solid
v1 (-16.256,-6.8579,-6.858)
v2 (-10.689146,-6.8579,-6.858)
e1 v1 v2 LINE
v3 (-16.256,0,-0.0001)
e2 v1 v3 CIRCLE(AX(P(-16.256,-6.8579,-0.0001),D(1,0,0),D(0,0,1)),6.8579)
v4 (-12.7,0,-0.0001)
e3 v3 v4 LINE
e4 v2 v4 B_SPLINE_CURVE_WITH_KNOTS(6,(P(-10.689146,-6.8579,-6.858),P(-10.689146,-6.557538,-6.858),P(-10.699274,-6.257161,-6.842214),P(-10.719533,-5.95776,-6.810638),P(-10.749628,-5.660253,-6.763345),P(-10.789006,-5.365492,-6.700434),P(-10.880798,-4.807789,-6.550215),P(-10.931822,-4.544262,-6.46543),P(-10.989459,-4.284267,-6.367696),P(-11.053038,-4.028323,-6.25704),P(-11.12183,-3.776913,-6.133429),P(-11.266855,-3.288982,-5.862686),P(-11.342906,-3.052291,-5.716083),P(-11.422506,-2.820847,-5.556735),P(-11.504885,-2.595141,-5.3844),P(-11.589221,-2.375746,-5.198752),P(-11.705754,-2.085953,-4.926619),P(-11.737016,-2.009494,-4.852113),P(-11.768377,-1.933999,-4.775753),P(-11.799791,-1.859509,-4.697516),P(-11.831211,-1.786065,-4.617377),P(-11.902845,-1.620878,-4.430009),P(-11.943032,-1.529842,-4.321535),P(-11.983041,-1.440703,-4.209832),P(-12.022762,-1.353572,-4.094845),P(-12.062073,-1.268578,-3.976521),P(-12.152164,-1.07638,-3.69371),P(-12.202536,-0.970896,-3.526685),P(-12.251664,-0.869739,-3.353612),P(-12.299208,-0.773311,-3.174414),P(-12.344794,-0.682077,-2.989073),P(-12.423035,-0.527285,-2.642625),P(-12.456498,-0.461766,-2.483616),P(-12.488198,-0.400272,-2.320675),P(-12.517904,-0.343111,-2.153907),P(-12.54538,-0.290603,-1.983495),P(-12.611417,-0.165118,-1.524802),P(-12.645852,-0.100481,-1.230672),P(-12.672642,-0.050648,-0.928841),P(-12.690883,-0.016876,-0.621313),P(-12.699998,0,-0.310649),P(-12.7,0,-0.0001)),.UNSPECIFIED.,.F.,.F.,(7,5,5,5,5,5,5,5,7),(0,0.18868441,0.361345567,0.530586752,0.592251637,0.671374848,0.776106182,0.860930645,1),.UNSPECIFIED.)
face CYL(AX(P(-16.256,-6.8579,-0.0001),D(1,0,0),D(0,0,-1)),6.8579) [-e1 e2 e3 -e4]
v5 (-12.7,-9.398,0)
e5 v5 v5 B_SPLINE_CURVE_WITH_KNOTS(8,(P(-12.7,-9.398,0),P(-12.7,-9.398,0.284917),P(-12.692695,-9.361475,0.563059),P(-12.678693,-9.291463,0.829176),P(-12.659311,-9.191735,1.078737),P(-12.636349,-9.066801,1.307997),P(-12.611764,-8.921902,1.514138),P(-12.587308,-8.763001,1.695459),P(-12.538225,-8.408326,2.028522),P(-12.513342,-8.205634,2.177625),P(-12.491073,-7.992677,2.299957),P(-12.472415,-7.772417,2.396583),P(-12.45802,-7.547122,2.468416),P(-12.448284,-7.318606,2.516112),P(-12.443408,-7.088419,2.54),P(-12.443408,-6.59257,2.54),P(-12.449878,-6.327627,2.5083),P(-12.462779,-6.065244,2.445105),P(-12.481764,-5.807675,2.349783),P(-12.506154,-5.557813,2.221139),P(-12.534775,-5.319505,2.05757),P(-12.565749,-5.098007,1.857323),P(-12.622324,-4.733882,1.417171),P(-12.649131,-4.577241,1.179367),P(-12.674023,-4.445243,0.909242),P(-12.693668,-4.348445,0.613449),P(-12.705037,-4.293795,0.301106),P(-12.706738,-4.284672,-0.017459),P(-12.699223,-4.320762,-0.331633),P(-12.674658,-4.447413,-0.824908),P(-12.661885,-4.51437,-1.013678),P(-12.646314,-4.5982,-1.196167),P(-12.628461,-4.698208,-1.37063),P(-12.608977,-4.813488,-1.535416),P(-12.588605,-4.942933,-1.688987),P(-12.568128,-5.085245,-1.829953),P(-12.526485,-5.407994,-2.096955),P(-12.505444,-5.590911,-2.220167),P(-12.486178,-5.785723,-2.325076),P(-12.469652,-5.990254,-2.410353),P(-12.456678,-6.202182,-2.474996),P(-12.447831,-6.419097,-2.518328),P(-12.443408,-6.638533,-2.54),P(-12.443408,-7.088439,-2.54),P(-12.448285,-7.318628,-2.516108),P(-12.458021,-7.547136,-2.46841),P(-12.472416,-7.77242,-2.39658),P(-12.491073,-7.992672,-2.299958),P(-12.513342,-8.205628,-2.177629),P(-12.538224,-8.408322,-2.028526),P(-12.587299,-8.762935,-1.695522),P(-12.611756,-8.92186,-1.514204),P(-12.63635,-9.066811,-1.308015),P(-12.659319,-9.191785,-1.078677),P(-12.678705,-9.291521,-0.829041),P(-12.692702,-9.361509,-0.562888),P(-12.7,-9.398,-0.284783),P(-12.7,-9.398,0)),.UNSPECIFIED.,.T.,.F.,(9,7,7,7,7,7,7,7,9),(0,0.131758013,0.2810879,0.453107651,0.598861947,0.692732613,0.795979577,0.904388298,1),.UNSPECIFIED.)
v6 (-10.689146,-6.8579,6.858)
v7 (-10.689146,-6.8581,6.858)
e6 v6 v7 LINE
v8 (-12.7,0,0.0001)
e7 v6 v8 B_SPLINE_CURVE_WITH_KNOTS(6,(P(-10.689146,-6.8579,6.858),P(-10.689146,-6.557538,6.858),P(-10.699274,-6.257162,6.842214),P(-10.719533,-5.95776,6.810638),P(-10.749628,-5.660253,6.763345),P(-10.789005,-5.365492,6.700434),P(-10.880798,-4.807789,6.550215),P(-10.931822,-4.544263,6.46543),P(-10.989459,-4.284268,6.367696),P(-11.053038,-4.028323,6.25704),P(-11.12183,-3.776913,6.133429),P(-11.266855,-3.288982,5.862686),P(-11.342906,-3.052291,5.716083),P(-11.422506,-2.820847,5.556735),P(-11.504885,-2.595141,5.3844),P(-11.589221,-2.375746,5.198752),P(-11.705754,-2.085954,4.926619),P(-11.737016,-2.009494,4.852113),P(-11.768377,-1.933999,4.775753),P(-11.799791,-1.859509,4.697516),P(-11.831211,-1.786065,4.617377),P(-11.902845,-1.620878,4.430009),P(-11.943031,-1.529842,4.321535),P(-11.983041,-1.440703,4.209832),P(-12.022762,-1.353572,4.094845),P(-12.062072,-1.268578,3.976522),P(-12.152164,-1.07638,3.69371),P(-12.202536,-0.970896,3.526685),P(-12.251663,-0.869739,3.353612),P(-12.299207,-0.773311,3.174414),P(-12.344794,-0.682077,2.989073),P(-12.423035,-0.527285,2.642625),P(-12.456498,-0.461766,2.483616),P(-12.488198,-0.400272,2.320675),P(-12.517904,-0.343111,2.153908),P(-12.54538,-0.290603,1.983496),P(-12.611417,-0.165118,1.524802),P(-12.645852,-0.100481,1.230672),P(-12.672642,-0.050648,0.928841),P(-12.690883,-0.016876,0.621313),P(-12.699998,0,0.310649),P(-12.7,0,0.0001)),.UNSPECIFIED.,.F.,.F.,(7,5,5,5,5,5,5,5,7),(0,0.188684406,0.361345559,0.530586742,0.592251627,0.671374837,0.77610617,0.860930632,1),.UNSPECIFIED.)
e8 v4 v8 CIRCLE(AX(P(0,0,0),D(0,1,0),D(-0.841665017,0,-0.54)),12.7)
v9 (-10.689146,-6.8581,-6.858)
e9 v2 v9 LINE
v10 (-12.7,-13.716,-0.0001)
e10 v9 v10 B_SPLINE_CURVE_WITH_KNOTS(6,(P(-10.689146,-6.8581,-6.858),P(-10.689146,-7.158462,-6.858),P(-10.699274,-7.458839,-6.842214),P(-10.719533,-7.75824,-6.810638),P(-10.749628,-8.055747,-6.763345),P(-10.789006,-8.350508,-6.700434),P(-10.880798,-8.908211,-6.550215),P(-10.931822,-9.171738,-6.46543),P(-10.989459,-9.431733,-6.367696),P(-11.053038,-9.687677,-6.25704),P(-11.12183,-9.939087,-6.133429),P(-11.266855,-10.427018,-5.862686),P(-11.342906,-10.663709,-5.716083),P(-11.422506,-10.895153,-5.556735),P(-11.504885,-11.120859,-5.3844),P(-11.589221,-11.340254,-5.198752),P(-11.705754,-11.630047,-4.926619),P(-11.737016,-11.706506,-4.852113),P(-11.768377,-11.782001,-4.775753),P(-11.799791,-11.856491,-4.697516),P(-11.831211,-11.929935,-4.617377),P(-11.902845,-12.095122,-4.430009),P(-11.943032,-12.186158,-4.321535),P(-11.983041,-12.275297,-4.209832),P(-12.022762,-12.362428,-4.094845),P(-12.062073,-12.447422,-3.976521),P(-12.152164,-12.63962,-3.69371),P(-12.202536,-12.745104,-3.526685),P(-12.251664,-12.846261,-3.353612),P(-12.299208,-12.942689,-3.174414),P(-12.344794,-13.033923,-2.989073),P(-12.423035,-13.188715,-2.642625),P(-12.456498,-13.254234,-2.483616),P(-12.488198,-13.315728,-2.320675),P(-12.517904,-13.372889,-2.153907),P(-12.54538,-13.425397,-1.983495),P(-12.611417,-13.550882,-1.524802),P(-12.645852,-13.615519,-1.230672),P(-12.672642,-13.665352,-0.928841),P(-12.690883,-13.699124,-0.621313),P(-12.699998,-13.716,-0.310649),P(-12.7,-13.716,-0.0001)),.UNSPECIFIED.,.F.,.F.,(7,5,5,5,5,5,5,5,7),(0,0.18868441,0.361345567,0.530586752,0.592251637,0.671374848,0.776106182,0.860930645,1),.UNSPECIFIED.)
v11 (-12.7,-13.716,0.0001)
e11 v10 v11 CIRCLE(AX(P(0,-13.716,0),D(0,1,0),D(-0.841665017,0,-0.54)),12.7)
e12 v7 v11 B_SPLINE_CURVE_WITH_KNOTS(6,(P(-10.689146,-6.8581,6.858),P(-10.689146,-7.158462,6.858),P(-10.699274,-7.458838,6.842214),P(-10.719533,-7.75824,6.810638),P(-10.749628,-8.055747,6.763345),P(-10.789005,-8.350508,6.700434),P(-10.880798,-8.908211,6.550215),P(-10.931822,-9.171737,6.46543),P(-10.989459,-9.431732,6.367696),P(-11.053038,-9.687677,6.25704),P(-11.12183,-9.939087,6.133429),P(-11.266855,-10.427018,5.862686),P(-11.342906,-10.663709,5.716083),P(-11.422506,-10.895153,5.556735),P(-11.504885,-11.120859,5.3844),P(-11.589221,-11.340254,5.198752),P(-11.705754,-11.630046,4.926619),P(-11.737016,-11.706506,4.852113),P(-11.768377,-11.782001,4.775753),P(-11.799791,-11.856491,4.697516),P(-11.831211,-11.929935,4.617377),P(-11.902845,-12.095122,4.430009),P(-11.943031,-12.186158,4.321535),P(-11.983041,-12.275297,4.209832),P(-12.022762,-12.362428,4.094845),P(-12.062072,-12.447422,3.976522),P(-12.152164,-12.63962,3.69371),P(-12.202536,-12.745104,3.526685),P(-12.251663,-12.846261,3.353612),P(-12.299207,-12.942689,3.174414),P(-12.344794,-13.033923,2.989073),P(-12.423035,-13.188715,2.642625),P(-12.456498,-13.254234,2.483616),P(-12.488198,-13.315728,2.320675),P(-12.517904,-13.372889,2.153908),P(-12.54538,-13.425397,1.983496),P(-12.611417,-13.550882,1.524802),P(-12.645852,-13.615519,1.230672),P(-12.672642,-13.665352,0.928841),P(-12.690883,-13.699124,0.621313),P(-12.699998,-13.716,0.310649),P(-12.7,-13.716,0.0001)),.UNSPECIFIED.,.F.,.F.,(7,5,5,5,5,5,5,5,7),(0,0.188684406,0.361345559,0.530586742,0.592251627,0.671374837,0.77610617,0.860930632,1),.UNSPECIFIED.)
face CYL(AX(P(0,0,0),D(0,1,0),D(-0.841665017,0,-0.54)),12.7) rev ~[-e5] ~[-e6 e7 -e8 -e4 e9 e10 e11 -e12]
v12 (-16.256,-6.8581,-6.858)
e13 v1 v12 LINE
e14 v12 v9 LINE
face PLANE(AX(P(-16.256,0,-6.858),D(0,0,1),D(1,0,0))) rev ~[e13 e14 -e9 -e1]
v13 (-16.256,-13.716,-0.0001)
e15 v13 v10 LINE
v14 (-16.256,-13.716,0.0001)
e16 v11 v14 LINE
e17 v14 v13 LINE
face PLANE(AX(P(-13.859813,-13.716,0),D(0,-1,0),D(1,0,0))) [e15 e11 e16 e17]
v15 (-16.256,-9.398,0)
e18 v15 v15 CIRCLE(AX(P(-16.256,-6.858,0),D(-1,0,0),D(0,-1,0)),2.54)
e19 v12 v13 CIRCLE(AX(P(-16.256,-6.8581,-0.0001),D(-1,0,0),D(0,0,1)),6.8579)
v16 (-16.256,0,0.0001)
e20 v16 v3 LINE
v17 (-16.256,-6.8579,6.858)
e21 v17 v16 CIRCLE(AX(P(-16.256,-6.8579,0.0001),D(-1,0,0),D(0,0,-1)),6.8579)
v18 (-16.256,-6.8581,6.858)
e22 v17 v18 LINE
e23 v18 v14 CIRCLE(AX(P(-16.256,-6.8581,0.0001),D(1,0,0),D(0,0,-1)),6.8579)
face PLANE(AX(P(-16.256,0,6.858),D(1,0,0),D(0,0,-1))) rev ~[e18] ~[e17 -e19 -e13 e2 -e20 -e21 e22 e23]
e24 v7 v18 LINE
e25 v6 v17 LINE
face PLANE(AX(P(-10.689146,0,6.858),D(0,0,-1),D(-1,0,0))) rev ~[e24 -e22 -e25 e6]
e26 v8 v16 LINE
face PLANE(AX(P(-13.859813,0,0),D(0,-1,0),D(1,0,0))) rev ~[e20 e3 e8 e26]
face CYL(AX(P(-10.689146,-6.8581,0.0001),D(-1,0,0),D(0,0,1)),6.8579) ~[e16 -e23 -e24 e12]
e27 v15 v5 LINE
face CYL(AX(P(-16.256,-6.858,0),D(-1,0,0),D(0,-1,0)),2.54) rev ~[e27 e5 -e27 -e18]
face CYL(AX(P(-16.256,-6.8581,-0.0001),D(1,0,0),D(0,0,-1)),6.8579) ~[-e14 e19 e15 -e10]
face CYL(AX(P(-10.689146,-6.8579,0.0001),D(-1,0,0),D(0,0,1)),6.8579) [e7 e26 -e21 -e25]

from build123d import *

# Parameters (mm, degrees)
F1_DEPTH = 13.716
F2_R     = 6.8579
F3_R     = 2.54
F4_DEPTH = 5.5678543904


# Not quite as in the source:
# - a fillet or chamfer is up to 0.001 mm smaller than in the source, because OpenCascade refuses the exact size


with BuildPart() as f1:
    # F0 (on Front) → F1 (new body)
    with BuildSketch(Plane.XZ):
        with BuildLine():
            ThreePointArc((-10.6891457096, -6.858), (-12.7, 0), (-10.6891457096, 6.858))
            Line((-10.6891457096, 6.858), (-16.256, 6.858))
            Line((-16.256, 6.858), (-16.256, 0))
            Line((-16.256, 0), (-16.256, -6.858))
            Line((-16.256, -6.858), (-10.6891457096, -6.858))
        make_face()
    extrude(amount=F1_DEPTH)

    # F2 (radius 6.858 in the source; OpenCascade refuses exactly that, so slightly less here)
    f2_edges = [f1.edges().sort_by_distance(p)[0] for p in [
        (-13.472573, 0, 6.858),
        (-13.472573, -13.716, 6.858),
        (-13.472573, -13.716, -6.858),
        (-13.472573, 0, -6.858),
    ]]
    fillet(f2_edges, radius=F2_R)

    # F3 (on face) → F4 (cut, through all)
    with BuildSketch(Plane(origin=(-16.256, 0, 0), x_dir=(0, -1, 0), z_dir=(-1, 0, 0))):
        with Locations((6.858, 0)):
            Circle(F3_R)
    extrude(amount=-F4_DEPTH, mode=Mode.SUBTRACT)


solid = f1.part
